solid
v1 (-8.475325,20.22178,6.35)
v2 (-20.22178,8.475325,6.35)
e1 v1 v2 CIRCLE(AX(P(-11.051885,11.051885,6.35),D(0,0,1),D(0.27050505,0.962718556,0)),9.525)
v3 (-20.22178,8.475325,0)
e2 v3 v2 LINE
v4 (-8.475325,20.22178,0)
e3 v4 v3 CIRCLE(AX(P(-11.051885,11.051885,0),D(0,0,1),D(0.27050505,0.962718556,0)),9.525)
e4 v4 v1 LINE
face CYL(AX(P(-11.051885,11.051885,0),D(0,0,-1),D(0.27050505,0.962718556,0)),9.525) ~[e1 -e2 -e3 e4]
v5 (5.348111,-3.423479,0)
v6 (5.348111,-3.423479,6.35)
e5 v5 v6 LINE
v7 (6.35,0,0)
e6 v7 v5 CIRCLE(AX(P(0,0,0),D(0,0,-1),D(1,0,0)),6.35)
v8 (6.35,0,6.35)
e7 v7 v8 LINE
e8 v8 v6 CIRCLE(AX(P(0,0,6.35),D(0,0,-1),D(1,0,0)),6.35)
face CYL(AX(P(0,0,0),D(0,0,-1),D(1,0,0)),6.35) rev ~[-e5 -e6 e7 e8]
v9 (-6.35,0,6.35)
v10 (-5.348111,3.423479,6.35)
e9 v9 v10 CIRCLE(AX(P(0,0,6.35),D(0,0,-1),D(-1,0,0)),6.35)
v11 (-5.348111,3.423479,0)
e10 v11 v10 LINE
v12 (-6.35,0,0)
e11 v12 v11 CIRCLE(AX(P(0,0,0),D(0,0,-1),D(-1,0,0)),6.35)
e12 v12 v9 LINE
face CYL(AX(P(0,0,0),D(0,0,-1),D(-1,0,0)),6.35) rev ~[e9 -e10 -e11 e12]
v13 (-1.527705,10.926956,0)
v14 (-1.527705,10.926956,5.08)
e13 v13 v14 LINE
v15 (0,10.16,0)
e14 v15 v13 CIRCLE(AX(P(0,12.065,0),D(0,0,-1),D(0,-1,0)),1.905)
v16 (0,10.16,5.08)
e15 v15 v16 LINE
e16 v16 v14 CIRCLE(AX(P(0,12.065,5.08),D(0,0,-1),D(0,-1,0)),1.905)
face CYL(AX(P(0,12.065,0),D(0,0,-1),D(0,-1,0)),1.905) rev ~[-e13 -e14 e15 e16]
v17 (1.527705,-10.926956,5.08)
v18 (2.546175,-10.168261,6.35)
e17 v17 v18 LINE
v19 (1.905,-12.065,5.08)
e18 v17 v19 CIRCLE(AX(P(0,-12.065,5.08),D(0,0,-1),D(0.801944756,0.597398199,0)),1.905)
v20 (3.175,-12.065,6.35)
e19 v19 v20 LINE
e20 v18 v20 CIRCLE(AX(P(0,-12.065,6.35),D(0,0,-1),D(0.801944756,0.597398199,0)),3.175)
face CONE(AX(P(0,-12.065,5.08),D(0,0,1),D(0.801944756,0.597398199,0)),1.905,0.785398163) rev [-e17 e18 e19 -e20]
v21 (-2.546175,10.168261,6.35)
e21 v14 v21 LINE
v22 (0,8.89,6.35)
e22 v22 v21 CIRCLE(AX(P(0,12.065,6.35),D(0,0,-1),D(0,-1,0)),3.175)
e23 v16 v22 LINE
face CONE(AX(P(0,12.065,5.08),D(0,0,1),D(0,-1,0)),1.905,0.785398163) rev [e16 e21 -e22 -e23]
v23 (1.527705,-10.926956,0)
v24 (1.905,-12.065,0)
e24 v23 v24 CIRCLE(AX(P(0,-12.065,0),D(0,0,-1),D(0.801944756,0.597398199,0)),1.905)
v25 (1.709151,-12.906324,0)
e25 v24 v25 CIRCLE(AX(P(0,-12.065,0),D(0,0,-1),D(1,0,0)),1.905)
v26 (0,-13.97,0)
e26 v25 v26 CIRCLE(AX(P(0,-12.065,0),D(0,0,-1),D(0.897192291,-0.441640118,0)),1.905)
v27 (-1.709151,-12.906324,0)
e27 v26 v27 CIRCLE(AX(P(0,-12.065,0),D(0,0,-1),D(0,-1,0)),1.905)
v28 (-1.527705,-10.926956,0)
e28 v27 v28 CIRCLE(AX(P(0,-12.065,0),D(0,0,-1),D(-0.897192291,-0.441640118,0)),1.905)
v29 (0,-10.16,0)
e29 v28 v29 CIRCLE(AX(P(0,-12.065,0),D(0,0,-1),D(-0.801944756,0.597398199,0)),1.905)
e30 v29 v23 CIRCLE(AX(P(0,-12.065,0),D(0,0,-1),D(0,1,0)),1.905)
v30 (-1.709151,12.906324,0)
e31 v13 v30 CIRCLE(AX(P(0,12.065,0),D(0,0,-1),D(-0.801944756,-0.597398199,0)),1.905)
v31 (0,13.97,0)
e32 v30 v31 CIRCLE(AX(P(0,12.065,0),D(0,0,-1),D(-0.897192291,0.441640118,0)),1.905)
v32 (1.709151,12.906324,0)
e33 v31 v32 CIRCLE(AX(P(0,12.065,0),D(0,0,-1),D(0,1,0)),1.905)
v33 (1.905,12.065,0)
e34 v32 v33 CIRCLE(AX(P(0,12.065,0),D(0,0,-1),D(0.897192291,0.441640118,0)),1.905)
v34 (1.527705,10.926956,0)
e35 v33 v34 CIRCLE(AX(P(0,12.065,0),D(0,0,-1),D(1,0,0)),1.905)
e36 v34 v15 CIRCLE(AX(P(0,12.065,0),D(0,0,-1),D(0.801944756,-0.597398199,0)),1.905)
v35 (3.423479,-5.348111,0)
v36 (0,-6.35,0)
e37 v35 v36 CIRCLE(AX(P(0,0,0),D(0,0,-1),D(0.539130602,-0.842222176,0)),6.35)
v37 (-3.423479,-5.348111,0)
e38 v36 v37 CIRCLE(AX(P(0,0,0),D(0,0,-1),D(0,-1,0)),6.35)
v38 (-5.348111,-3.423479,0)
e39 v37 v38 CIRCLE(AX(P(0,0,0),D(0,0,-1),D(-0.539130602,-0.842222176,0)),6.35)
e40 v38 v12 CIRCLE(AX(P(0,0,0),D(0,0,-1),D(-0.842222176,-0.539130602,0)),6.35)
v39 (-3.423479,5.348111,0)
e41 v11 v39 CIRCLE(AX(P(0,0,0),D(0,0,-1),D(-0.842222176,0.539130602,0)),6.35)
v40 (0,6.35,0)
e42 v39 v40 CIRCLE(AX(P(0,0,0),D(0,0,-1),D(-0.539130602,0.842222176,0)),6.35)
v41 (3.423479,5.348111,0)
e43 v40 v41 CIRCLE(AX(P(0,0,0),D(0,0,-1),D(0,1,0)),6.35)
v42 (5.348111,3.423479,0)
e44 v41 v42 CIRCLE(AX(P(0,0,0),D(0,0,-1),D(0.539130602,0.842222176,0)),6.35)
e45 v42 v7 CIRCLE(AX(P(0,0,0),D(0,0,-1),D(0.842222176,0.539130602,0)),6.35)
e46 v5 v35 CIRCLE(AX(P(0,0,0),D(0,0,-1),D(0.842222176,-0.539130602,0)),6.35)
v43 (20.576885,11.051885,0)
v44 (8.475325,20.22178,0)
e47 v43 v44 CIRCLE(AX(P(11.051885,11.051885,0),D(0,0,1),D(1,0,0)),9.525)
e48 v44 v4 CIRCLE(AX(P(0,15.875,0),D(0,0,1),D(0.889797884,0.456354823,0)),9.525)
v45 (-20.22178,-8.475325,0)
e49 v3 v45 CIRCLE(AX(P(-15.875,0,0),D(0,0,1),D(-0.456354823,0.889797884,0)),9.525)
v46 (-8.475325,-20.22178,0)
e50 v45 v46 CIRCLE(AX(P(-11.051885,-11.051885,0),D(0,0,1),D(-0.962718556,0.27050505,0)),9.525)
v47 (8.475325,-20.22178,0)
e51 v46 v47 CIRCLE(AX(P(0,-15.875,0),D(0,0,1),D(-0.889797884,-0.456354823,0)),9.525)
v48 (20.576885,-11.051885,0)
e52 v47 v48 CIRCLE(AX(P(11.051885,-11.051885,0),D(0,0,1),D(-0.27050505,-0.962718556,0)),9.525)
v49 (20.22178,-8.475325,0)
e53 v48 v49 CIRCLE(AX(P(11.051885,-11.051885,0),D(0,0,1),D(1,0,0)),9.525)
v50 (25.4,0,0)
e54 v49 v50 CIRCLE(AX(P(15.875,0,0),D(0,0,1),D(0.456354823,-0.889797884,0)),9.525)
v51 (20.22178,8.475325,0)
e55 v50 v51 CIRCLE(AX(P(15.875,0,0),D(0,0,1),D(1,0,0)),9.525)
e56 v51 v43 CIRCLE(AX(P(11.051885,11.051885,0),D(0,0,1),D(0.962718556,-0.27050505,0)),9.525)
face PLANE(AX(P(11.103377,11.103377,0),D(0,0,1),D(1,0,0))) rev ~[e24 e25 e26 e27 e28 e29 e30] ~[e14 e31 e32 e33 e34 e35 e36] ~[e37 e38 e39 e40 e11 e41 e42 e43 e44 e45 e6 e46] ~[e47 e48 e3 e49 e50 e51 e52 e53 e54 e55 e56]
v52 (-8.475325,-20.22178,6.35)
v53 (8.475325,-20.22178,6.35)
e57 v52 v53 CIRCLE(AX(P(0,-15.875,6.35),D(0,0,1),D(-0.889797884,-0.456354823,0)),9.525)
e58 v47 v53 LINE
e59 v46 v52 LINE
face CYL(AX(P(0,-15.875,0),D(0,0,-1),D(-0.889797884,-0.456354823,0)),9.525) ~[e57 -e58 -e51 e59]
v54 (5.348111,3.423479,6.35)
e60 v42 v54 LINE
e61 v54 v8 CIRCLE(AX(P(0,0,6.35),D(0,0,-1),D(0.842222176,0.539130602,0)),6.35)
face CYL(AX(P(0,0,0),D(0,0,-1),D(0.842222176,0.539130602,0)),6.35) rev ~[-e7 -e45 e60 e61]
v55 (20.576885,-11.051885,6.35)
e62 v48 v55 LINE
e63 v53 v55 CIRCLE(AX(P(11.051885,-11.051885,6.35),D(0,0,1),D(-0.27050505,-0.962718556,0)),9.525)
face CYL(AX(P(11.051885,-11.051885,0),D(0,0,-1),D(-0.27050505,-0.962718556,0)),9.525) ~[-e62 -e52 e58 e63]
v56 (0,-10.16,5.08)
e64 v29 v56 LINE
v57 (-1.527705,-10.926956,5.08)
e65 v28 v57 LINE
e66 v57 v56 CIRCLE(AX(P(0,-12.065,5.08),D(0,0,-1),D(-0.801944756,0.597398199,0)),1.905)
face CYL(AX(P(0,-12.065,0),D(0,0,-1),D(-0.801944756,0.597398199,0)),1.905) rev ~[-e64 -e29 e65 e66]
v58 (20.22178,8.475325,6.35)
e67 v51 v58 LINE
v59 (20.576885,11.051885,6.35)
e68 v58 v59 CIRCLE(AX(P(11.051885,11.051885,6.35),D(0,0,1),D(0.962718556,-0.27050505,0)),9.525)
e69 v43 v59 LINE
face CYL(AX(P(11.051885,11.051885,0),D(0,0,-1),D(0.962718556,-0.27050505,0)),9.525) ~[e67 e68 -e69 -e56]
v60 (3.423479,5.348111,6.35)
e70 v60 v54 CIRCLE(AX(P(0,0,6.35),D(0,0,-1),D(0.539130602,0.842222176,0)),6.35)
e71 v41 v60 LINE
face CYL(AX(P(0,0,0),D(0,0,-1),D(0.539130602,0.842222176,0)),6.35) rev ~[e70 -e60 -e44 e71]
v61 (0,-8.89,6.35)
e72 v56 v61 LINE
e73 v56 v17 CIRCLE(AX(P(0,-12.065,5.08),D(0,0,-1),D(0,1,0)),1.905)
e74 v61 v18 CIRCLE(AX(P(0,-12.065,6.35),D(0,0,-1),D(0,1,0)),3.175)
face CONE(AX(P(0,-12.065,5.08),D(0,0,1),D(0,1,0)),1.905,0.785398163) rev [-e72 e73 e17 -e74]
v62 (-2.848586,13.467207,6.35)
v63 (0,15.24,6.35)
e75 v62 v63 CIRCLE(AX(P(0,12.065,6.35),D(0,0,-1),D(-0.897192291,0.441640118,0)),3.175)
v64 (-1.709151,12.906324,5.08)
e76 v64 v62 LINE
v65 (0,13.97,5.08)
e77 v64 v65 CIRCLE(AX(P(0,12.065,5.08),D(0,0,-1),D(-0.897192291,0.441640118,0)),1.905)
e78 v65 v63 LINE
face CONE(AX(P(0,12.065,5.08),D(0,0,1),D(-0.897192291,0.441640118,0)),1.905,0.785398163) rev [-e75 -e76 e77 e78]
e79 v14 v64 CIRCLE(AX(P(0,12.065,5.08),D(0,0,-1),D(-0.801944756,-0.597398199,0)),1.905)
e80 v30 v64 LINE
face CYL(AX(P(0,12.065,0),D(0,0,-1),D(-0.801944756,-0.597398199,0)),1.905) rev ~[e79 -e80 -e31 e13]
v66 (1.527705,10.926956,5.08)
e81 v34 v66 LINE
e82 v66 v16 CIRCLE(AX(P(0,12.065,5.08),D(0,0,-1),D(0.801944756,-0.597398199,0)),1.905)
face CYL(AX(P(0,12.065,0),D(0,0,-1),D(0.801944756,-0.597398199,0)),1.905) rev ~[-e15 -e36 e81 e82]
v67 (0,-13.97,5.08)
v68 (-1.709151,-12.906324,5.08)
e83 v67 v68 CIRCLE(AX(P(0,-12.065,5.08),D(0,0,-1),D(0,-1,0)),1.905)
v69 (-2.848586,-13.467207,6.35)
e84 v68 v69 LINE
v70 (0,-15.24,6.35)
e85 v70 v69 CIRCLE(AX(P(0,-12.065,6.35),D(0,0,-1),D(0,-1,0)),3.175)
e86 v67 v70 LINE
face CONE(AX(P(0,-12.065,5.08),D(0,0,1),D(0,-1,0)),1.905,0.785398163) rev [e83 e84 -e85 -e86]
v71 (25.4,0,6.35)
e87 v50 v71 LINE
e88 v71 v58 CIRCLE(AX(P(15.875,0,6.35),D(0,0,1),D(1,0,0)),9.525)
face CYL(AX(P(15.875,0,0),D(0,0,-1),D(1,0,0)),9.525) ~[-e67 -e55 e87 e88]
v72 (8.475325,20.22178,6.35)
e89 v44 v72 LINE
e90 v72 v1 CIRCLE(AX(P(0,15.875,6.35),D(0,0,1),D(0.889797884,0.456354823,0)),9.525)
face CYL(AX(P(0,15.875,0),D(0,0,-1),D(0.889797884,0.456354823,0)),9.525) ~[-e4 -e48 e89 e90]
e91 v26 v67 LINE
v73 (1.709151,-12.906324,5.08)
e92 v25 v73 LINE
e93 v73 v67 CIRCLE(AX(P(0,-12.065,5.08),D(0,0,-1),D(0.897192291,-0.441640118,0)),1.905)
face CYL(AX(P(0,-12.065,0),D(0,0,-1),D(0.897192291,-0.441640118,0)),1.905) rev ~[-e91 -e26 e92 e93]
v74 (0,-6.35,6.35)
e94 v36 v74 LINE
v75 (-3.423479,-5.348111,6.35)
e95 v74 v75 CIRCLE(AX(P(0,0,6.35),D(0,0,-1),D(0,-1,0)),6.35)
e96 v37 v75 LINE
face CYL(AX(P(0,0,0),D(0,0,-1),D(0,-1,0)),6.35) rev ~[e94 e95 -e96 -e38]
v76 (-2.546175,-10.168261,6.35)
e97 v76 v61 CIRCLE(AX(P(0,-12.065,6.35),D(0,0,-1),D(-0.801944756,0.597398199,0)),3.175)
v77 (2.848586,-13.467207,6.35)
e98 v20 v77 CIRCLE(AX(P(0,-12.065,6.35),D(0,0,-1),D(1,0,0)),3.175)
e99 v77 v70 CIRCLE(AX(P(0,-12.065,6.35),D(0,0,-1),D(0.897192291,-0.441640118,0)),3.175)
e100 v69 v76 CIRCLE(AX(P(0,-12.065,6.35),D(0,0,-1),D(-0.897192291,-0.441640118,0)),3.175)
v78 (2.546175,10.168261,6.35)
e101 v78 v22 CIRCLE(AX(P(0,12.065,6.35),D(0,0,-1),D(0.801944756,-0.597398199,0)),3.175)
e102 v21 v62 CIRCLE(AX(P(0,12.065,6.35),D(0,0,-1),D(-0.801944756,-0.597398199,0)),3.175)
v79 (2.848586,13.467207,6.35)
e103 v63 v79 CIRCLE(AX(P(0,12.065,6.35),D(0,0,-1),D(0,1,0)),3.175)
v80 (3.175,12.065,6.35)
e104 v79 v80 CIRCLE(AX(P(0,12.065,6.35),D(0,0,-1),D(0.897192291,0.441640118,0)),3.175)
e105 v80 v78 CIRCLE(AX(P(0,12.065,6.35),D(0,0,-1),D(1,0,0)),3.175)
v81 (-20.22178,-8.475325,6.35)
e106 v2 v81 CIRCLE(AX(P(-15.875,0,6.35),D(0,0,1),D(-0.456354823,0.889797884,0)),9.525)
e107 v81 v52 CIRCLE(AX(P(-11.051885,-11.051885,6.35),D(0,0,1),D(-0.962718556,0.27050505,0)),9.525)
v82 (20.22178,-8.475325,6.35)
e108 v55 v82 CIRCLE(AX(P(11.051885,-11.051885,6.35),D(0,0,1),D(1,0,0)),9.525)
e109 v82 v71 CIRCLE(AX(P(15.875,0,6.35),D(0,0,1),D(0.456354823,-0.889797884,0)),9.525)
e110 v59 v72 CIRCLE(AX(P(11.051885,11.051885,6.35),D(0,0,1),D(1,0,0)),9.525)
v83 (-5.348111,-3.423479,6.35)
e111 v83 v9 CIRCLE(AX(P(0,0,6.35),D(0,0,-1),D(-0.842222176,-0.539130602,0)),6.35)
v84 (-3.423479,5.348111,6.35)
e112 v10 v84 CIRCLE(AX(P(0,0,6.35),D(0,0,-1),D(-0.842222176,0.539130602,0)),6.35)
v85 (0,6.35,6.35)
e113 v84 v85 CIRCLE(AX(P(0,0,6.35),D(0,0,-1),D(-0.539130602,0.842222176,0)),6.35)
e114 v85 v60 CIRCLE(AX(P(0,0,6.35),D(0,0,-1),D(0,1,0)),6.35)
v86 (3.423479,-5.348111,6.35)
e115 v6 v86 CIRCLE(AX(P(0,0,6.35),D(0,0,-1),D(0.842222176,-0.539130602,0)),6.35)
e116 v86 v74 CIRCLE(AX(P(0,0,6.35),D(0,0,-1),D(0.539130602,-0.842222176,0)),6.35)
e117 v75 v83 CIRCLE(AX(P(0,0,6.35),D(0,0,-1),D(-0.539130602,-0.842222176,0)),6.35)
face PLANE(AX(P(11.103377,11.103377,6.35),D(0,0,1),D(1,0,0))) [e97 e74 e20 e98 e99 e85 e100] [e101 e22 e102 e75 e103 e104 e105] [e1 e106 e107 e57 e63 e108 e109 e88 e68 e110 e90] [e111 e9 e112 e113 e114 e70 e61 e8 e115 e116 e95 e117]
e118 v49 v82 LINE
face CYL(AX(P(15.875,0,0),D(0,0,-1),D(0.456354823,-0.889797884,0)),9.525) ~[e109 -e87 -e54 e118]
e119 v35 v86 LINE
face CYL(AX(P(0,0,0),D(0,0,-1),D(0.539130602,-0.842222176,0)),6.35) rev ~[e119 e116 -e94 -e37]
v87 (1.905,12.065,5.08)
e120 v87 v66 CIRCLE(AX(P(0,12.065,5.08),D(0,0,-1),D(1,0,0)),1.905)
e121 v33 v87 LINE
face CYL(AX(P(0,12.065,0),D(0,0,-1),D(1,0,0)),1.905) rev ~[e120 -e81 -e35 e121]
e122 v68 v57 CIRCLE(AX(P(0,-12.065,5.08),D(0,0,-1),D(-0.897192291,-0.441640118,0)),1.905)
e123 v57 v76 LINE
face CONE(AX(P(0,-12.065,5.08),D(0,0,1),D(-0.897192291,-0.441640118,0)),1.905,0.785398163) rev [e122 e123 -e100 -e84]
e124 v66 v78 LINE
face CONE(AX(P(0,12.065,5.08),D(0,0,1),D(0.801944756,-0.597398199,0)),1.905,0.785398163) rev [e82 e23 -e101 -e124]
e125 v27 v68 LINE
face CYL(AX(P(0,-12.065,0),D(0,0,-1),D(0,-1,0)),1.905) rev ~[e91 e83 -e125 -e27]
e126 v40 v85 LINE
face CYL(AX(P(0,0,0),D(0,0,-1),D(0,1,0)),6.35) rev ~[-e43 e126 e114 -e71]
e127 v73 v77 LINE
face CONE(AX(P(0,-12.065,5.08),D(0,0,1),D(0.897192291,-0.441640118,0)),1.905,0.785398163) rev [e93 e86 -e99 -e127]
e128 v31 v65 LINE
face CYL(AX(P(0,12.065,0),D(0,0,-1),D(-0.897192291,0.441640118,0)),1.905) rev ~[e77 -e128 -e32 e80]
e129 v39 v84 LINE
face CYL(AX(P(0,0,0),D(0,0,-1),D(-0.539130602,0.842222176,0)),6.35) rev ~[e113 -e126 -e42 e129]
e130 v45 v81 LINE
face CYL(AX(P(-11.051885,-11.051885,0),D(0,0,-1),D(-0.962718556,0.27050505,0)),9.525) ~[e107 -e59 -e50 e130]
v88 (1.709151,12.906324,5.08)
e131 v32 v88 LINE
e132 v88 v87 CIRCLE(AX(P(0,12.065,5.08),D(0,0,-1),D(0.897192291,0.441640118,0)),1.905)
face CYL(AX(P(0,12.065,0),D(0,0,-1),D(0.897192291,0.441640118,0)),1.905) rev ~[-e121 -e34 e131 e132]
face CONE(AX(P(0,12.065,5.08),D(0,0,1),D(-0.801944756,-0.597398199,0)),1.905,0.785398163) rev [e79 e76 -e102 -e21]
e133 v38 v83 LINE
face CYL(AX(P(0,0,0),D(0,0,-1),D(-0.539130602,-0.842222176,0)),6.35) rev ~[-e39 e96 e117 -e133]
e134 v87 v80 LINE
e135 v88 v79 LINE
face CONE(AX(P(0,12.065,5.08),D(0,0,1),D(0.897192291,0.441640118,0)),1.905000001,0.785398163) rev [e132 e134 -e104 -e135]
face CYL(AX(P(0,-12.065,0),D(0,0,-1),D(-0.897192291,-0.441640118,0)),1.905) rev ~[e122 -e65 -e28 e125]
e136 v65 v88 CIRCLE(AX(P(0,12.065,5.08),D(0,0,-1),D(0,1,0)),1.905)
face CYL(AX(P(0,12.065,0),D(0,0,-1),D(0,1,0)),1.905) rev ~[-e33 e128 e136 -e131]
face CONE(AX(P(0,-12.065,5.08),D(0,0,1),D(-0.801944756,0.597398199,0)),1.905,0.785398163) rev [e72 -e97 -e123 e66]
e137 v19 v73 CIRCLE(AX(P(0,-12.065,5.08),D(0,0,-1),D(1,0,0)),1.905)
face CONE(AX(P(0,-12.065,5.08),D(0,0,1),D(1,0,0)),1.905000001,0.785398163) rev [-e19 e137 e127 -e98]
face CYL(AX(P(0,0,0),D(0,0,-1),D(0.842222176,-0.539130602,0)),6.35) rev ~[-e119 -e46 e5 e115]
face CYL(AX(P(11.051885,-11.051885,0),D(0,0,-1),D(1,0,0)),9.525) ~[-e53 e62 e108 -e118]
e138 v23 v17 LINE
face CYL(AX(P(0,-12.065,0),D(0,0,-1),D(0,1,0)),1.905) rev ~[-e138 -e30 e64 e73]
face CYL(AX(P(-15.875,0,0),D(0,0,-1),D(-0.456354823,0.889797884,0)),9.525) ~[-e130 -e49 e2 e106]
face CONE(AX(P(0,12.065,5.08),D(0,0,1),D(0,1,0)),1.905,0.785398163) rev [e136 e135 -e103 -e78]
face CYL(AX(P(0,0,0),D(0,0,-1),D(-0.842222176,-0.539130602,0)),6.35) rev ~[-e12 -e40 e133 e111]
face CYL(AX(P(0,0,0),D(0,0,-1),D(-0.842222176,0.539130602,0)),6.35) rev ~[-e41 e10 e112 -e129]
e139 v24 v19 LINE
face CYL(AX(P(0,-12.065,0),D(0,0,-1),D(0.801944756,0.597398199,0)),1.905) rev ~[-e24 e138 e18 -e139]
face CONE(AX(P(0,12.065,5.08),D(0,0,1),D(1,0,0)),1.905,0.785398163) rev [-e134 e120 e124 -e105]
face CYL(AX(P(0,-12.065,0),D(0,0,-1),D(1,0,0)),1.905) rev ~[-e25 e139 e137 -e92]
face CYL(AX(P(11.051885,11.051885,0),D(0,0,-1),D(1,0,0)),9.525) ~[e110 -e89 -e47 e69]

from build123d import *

# Parameters (mm, degrees)
F1_DEPTH = 6.35
F2_SIZE  = 1.27


with BuildPart() as f1:
    # F0 (on Top) → F1 (new body)
    with BuildSketch(Plane.XY):
        with BuildLine():
            Line((9.0862708935, 13.0175), (13.0175, 9.0862708935))
            ThreePointArc((13.0175, 9.0862708935), (11.2253201513, 11.2253201513), (9.0862708935, 13.0175))
        make_face()
        with BuildLine():
            ThreePointArc((20.221779693, 8.4753248493), (16.6798616454, 9.4909337123), (13.0175, 9.0862708935))
            ThreePointArc((13.0175, 9.0862708935), (14.680846164, 6.0405613073), (15.6426389263, 2.7061914978))
            ThreePointArc((15.6426389263, 2.7061914978), (18.5124203716, 5.1302265884), (20.221779693, 8.4753248493))
        make_face()
        with BuildLine():
            ThreePointArc((9.0862708935, 13.0175), (11.2253201513, 11.2253201513), (13.0175, 9.0862708935))
            ThreePointArc((13.0175, 9.0862708935), (16.6798616454, 9.4909337123), (20.221779693, 8.4753248493))
            ThreePointArc((20.221779693, 8.4753248493), (20.4876913926, 9.751427392), (20.5768854467, 11.0518854467))
            ThreePointArc((20.5768854467, 11.0518854467), (16.8044451078, 18.6435705262), (8.4753248493, 20.221779693))
            ThreePointArc((8.4753248493, 20.221779693), (9.2588631643, 18.1108617814), (9.525, 15.875))
            ThreePointArc((9.525, 15.875), (9.4146788384, 14.4295079143), (9.0862708935, 13.0175))
        make_face()
        with BuildLine():
            ThreePointArc((15.6426389263, 2.7061914978), (14.680846164, 6.0405613073), (13.0175, 9.0862708935))
            ThreePointArc((13.0175, 9.0862708935), (9.0369714008, 6.6307608822), (6.7051057537, 2.5765605975))
            ThreePointArc((6.7051057537, 2.5765605975), (11.1900224972, 1.5278871711), (15.6426389263, 2.7061914978))
        make_face()
        with BuildLine():
            ThreePointArc((6.7051057537, 2.5765605975), (9.0369714008, 6.6307608822), (13.0175, 9.0862708935))
            Line((13.0175, 9.0862708935), (9.0862708935, 13.0175))
            ThreePointArc((9.0862708935, 13.0175), (6.6307608822, 9.0369714008), (2.5765605975, 6.7051057537))
            ThreePointArc((2.5765605975, 6.7051057537), (2.9714834378, 6.0087982599), (3.4234793231, 5.3481108183))
            ThreePointArc((3.4234793231, 5.3481108183), (4.4901280605, 4.4901280605), (5.3481108183, 3.4234793231))
            ThreePointArc((5.3481108183, 3.4234793231), (6.0087982599, 2.9714834378), (6.7051057537, 2.5765605975))
        make_face()
        with BuildLine():
            ThreePointArc((2.5765605975, 6.7051057537), (6.6307608822, 9.0369714008), (9.0862708935, 13.0175))
            ThreePointArc((9.0862708935, 13.0175), (6.0405613073, 14.680846164), (2.7061914978, 15.6426389263))
            ThreePointArc((2.7061914978, 15.6426389263), (2.1024733841, 14.3128130347), (1.7091513138, 12.9063244241))
            ThreePointArc((1.7091513138, 12.9063244241), (1.8553919064, 12.4969095665), (1.905, 12.065))
            ThreePointArc((1.905, 12.065), (1.8082177094, 11.465522131), (1.5277047607, 10.9269564313))
            ThreePointArc((1.5277047607, 10.9269564313), (1.8078843831, 8.7553512461), (2.5765605975, 6.7051057537))
        make_face()
        with BuildLine():
            ThreePointArc((2.7061914978, 15.6426389263), (6.0405613073, 14.680846164), (9.0862708935, 13.0175))
            ThreePointArc((9.0862708935, 13.0175), (9.4146788384, 14.4295079143), (9.525, 15.875))
            ThreePointArc((9.525, 15.875), (9.2588631643, 18.1108617814), (8.4753248493, 20.221779693))
            ThreePointArc((8.4753248493, 20.221779693), (5.1302265884, 18.5124203716), (2.7061914978, 15.6426389263))
        make_face()
        with BuildLine():
            ThreePointArc((20.221779693, 8.4753248493), (18.5124203716, 5.1302265884), (15.6426389263, 2.7061914978))
            ThreePointArc((15.6426389263, 2.7061914978), (15.8168030581, 1.3580743804), (15.875, 0))
            ThreePointArc((15.875, 0), (15.8168030581, -1.3580743804), (15.6426389263, -2.7061914978))
            ThreePointArc((15.6426389263, -2.7061914978), (18.5124203716, -5.1302265884), (20.221779693, -8.4753248493))
            ThreePointArc((20.221779693, -8.4753248493), (24.0029979569, -4.9660119021), (25.4, 0))
            ThreePointArc((25.4, 0), (24.0029979569, 4.9660119021), (20.221779693, 8.4753248493))
        make_face()
        with BuildLine():
            ThreePointArc((15.875, 0), (15.8168030581, 1.3580743804), (15.6426389263, 2.7061914978))
            ThreePointArc((15.6426389263, 2.7061914978), (11.1900224972, 1.5278871711), (6.7051057537, 2.5765605975))
            ThreePointArc((6.7051057537, 2.5765605975), (6.4391940541, 1.3004580548), (6.35, 0))
            Line((6.35, 0), (15.875, 0))
        make_face()
        with BuildLine():
            ThreePointArc((6.35, 0), (6.4391940541, 1.3004580548), (6.7051057537, 2.5765605975))
            ThreePointArc((6.7051057537, 2.5765605975), (6.0087982599, 2.9714834378), (5.3481108183, 3.4234793231))
            ThreePointArc((5.3481108183, 3.4234793231), (6.0943828111, 1.783535296), (6.35, 0))
        make_face()
        with BuildLine():
            ThreePointArc((1.7091513138, 12.9063244241), (2.1024733841, 14.3128130347), (2.7061914978, 15.6426389263))
            ThreePointArc((2.7061914978, 15.6426389263), (1.3580743804, 15.8168030581), (0, 15.875))
            Line((0, 15.875), (0, 13.97))
            ThreePointArc((0, 13.97), (1.0065540155, 13.6823663821), (1.7091513138, 12.9063244241))
        make_face()
        with BuildLine():
            ThreePointArc((0, 15.875), (1.3580743804, 15.8168030581), (2.7061914978, 15.6426389263))
            ThreePointArc((2.7061914978, 15.6426389263), (5.1302265884, 18.5124203716), (8.4753248493, 20.221779693))
            ThreePointArc((8.4753248493, 20.221779693), (0, 25.4), (-8.4753248493, 20.221779693))
            ThreePointArc((-8.4753248493, 20.221779693), (-5.1302265884, 18.5124203716), (-2.7061914978, 15.6426389263))
            ThreePointArc((-2.7061914978, 15.6426389263), (-1.3580743804, 15.8168030581), (0, 15.875))
        make_face()
        with BuildLine():
            ThreePointArc((3.4234793231, 5.3481108183), (2.9714834378, 6.0087982599), (2.5765605975, 6.7051057537))
            ThreePointArc((2.5765605975, 6.7051057537), (1.3004580548, 6.4391940541), (0, 6.35))
            ThreePointArc((0, 6.35), (1.783535296, 6.0943828111), (3.4234793231, 5.3481108183))
        make_face()
        with BuildLine():
            ThreePointArc((0, 6.35), (1.3004580548, 6.4391940541), (2.5765605975, 6.7051057537))
            ThreePointArc((2.5765605975, 6.7051057537), (1.8078843831, 8.7553512461), (1.5277047607, 10.9269564313))
            ThreePointArc((1.5277047607, 10.9269564313), (0.8547081378, 10.3625021295), (0, 10.16))
            Line((0, 10.16), (0, 6.35))
        make_face()
        with BuildLine():
            ThreePointArc((15.6426389263, -2.7061914978), (15.8168030581, -1.3580743804), (15.875, 0))
            Line((15.875, 0), (6.35, 0))
            ThreePointArc((6.35, 0), (6.4391940541, -1.3004580548), (6.7051057537, -2.5765605975))
            ThreePointArc((6.7051057537, -2.5765605975), (11.1900224972, -1.5278871711), (15.6426389263, -2.7061914978))
        make_face()
        with BuildLine():
            ThreePointArc((6.7051057537, -2.5765605975), (6.4391940541, -1.3004580548), (6.35, 0))
            ThreePointArc((6.35, 0), (6.0943828111, -1.783535296), (5.3481108183, -3.4234793231))
            ThreePointArc((5.3481108183, -3.4234793231), (6.0087982599, -2.9714834378), (6.7051057537, -2.5765605975))
        make_face()
        with BuildLine():
            Line((0, 13.97), (0, 15.875))
            ThreePointArc((0, 15.875), (-1.3580743804, 15.8168030581), (-2.7061914978, 15.6426389263))
            ThreePointArc((-2.7061914978, 15.6426389263), (-2.1024733841, 14.3128130347), (-1.7091513138, 12.9063244241))
            ThreePointArc((-1.7091513138, 12.9063244241), (-1.0065540155, 13.6823663821), (0, 13.97))
        make_face()
        with BuildLine():
            ThreePointArc((-2.5765605975, 6.7051057537), (-1.3004580548, 6.4391940541), (0, 6.35))
            Line((0, 6.35), (0, 10.16))
            ThreePointArc((0, 10.16), (-0.8547081378, 10.3625021295), (-1.5277047607, 10.9269564313))
            ThreePointArc((-1.5277047607, 10.9269564313), (-1.8078843831, 8.7553512461), (-2.5765605975, 6.7051057537))
        make_face()
        with BuildLine():
            ThreePointArc((-3.4234793231, 5.3481108183), (-1.783535296, 6.0943828111), (0, 6.35))
            ThreePointArc((0, 6.35), (-1.3004580548, 6.4391940541), (-2.5765605975, 6.7051057537))
            ThreePointArc((-2.5765605975, 6.7051057537), (-2.9714834378, 6.0087982599), (-3.4234793231, 5.3481108183))
        make_face()
        with BuildLine():
            ThreePointArc((20.221779693, -8.4753248493), (18.5124203716, -5.1302265884), (15.6426389263, -2.7061914978))
            ThreePointArc((15.6426389263, -2.7061914978), (14.680846164, -6.0405613073), (13.0175, -9.0862708935))
            ThreePointArc((13.0175, -9.0862708935), (16.6798616454, -9.4909337123), (20.221779693, -8.4753248493))
        make_face()
        with BuildLine():
            ThreePointArc((13.0175, -9.0862708935), (14.680846164, -6.0405613073), (15.6426389263, -2.7061914978))
            ThreePointArc((15.6426389263, -2.7061914978), (11.1900224972, -1.5278871711), (6.7051057537, -2.5765605975))
            ThreePointArc((6.7051057537, -2.5765605975), (9.0369714008, -6.6307608822), (13.0175, -9.0862708935))
        make_face()
        with BuildLine():
            ThreePointArc((20.5768854467, -11.0518854467), (20.4876913926, -9.751427392), (20.221779693, -8.4753248493))
            ThreePointArc((20.221779693, -8.4753248493), (16.6798616454, -9.4909337123), (13.0175, -9.0862708935))
            ThreePointArc((13.0175, -9.0862708935), (11.2253201513, -11.2253201513), (9.0862708935, -13.0175))
            ThreePointArc((9.0862708935, -13.0175), (9.4146788384, -14.4295079143), (9.525, -15.875))
            ThreePointArc((9.525, -15.875), (9.2588631643, -18.1108617814), (8.4753248493, -20.221779693))
            ThreePointArc((8.4753248493, -20.221779693), (16.8044451078, -18.6435705262), (20.5768854467, -11.0518854467))
        make_face()
        with BuildLine():
            ThreePointArc((13.0175, -9.0862708935), (9.0369714008, -6.6307608822), (6.7051057537, -2.5765605975))
            ThreePointArc((6.7051057537, -2.5765605975), (6.0087982599, -2.9714834378), (5.3481108183, -3.4234793231))
            ThreePointArc((5.3481108183, -3.4234793231), (4.4901280605, -4.4901280605), (3.4234793231, -5.3481108183))
            ThreePointArc((3.4234793231, -5.3481108183), (2.9714834378, -6.0087982599), (2.5765605975, -6.7051057537))
            ThreePointArc((2.5765605975, -6.7051057537), (6.6307608822, -9.0369714008), (9.0862708935, -13.0175))
            Line((9.0862708935, -13.0175), (13.0175, -9.0862708935))
        make_face()
        with BuildLine():
            ThreePointArc((-1.7091513138, 12.9063244241), (-2.1024733841, 14.3128130347), (-2.7061914978, 15.6426389263))
            ThreePointArc((-2.7061914978, 15.6426389263), (-6.0405613073, 14.680846164), (-9.0862708935, 13.0175))
            ThreePointArc((-9.0862708935, 13.0175), (-6.6307608822, 9.0369714008), (-2.5765605975, 6.7051057537))
            ThreePointArc((-2.5765605975, 6.7051057537), (-1.8078843831, 8.7553512461), (-1.5277047607, 10.9269564313))
            ThreePointArc((-1.5277047607, 10.9269564313), (-1.8970460523, 11.8910998114), (-1.7091513138, 12.9063244241))
        make_face()
        with BuildLine():
            ThreePointArc((-9.0862708935, 13.0175), (-6.0405613073, 14.680846164), (-2.7061914978, 15.6426389263))
            ThreePointArc((-2.7061914978, 15.6426389263), (-5.1302265884, 18.5124203716), (-8.4753248493, 20.221779693))
            ThreePointArc((-8.4753248493, 20.221779693), (-9.4909337123, 16.6798616454), (-9.0862708935, 13.0175))
        make_face()
        with BuildLine():
            ThreePointArc((-9.0862708935, 13.0175), (-9.4909337123, 16.6798616454), (-8.4753248493, 20.221779693))
            ThreePointArc((-8.4753248493, 20.221779693), (-17.7870775376, 17.7870775376), (-20.221779693, 8.4753248493))
            ThreePointArc((-20.221779693, 8.4753248493), (-16.6798616454, 9.4909337123), (-13.0175, 9.0862708935))
            ThreePointArc((-13.0175, 9.0862708935), (-11.2253201513, 11.2253201513), (-9.0862708935, 13.0175))
        make_face()
        with BuildLine():
            ThreePointArc((-3.4234793231, 5.3481108183), (-2.9714834378, 6.0087982599), (-2.5765605975, 6.7051057537))
            ThreePointArc((-2.5765605975, 6.7051057537), (-6.6307608822, 9.0369714008), (-9.0862708935, 13.0175))
            Line((-9.0862708935, 13.0175), (-13.0175, 9.0862708935))
            ThreePointArc((-13.0175, 9.0862708935), (-9.0369714008, 6.6307608822), (-6.7051057537, 2.5765605975))
            ThreePointArc((-6.7051057537, 2.5765605975), (-6.0087982599, 2.9714834378), (-5.3481108183, 3.4234793231))
            ThreePointArc((-5.3481108183, 3.4234793231), (-4.4901280605, 4.4901280605), (-3.4234793231, 5.3481108183))
        make_face()
        with BuildLine():
            ThreePointArc((9.0862708935, -13.0175), (11.2253201513, -11.2253201513), (13.0175, -9.0862708935))
            Line((13.0175, -9.0862708935), (9.0862708935, -13.0175))
        make_face()
        with BuildLine():
            ThreePointArc((2.5765605975, -6.7051057537), (1.3004580548, -6.4391940541), (0, -6.35))
            Line((0, -6.35), (0, -10.16))
            ThreePointArc((0, -10.16), (0.8547081378, -10.3625021295), (1.5277047607, -10.9269564313))
            ThreePointArc((1.5277047607, -10.9269564313), (1.8078843831, -8.7553512461), (2.5765605975, -6.7051057537))
        make_face()
        with BuildLine():
            ThreePointArc((3.4234793231, -5.3481108183), (1.783535296, -6.0943828111), (0, -6.35))
            ThreePointArc((0, -6.35), (1.3004580548, -6.4391940541), (2.5765605975, -6.7051057537))
            ThreePointArc((2.5765605975, -6.7051057537), (2.9714834378, -6.0087982599), (3.4234793231, -5.3481108183))
        make_face()
        with BuildLine():
            Line((0, -10.16), (0, -6.35))
            ThreePointArc((0, -6.35), (-1.3004580548, -6.4391940541), (-2.5765605975, -6.7051057537))
            ThreePointArc((-2.5765605975, -6.7051057537), (-1.8078843831, -8.7553512461), (-1.5277047607, -10.9269564313))
            ThreePointArc((-1.5277047607, -10.9269564313), (-0.8547081378, -10.3625021295), (0, -10.16))
        make_face()
        with BuildLine():
            ThreePointArc((-2.5765605975, -6.7051057537), (-1.3004580548, -6.4391940541), (0, -6.35))
            ThreePointArc((0, -6.35), (-1.783535296, -6.0943828111), (-3.4234793231, -5.3481108183))
            ThreePointArc((-3.4234793231, -5.3481108183), (-2.9714834378, -6.0087982599), (-2.5765605975, -6.7051057537))
        make_face()
        with BuildLine():
            ThreePointArc((-6.7051057537, -2.5765605975), (-6.4391940541, -1.3004580548), (-6.35, 0))
            Line((-6.35, 0), (-15.875, 0))
            ThreePointArc((-15.875, 0), (-15.8168030581, -1.3580743804), (-15.6426389263, -2.7061914978))
            ThreePointArc((-15.6426389263, -2.7061914978), (-11.1900224972, -1.5278871711), (-6.7051057537, -2.5765605975))
        make_face()
        with BuildLine():
            Line((-15.875, 0), (-6.35, 0))
            ThreePointArc((-6.35, 0), (-6.4391940541, 1.3004580548), (-6.7051057537, 2.5765605975))
            ThreePointArc((-6.7051057537, 2.5765605975), (-11.1900224972, 1.5278871711), (-15.6426389263, 2.7061914978))
            ThreePointArc((-15.6426389263, 2.7061914978), (-15.8168030581, 1.3580743804), (-15.875, 0))
        make_face()
        with BuildLine():
            ThreePointArc((-5.3481108183, -3.4234793231), (-6.0943828111, -1.783535296), (-6.35, 0))
            ThreePointArc((-6.35, 0), (-6.4391940541, -1.3004580548), (-6.7051057537, -2.5765605975))
            ThreePointArc((-6.7051057537, -2.5765605975), (-6.0087982599, -2.9714834378), (-5.3481108183, -3.4234793231))
        make_face()
        with BuildLine():
            ThreePointArc((-6.7051057537, 2.5765605975), (-6.4391940541, 1.3004580548), (-6.35, 0))
            ThreePointArc((-6.35, 0), (-6.0943828111, 1.783535296), (-5.3481108183, 3.4234793231))
            ThreePointArc((-5.3481108183, 3.4234793231), (-6.0087982599, 2.9714834378), (-6.7051057537, 2.5765605975))
        make_face()
        with BuildLine():
            Line((-13.0175, 9.0862708935), (-9.0862708935, 13.0175))
            ThreePointArc((-9.0862708935, 13.0175), (-11.2253201513, 11.2253201513), (-13.0175, 9.0862708935))
        make_face()
        with BuildLine():
            ThreePointArc((-15.6426389263, 2.7061914978), (-18.5124203716, 5.1302265884), (-20.221779693, 8.4753248493))
            ThreePointArc((-20.221779693, 8.4753248493), (-25.4, 0), (-20.221779693, -8.4753248493))
            ThreePointArc((-20.221779693, -8.4753248493), (-18.5124203716, -5.1302265884), (-15.6426389263, -2.7061914978))
            ThreePointArc((-15.6426389263, -2.7061914978), (-15.8168030581, -1.3580743804), (-15.875, 0))
            ThreePointArc((-15.875, 0), (-15.8168030581, 1.3580743804), (-15.6426389263, 2.7061914978))
        make_face()
        with BuildLine():
            ThreePointArc((-13.0175, 9.0862708935), (-16.6798616454, 9.4909337123), (-20.221779693, 8.4753248493))
            ThreePointArc((-20.221779693, 8.4753248493), (-18.5124203716, 5.1302265884), (-15.6426389263, 2.7061914978))
            ThreePointArc((-15.6426389263, 2.7061914978), (-14.680846164, 6.0405613073), (-13.0175, 9.0862708935))
        make_face()
        with BuildLine():
            ThreePointArc((9.525, -15.875), (9.4146788384, -14.4295079143), (9.0862708935, -13.0175))
            ThreePointArc((9.0862708935, -13.0175), (6.0405613073, -14.680846164), (2.7061914978, -15.6426389263))
            ThreePointArc((2.7061914978, -15.6426389263), (5.1302265884, -18.5124203716), (8.4753248493, -20.221779693))
            ThreePointArc((8.4753248493, -20.221779693), (9.2588631643, -18.1108617814), (9.525, -15.875))
        make_face()
        with BuildLine():
            ThreePointArc((2.7061914978, -15.6426389263), (6.0405613073, -14.680846164), (9.0862708935, -13.0175))
            ThreePointArc((9.0862708935, -13.0175), (6.6307608822, -9.0369714008), (2.5765605975, -6.7051057537))
            ThreePointArc((2.5765605975, -6.7051057537), (1.8078843831, -8.7553512461), (1.5277047607, -10.9269564313))
            ThreePointArc((1.5277047607, -10.9269564313), (1.8082177094, -11.465522131), (1.905, -12.065))
            ThreePointArc((1.905, -12.065), (1.8553919064, -12.4969095665), (1.7091513138, -12.9063244241))
            ThreePointArc((1.7091513138, -12.9063244241), (2.1024733841, -14.3128130347), (2.7061914978, -15.6426389263))
        make_face()
        with BuildLine():
            ThreePointArc((-8.4753248493, -20.221779693), (0, -25.4), (8.4753248493, -20.221779693))
            ThreePointArc((8.4753248493, -20.221779693), (5.1302265884, -18.5124203716), (2.7061914978, -15.6426389263))
            ThreePointArc((2.7061914978, -15.6426389263), (1.3580743804, -15.8168030581), (0, -15.875))
            ThreePointArc((0, -15.875), (-1.3580743804, -15.8168030581), (-2.7061914978, -15.6426389263))
            ThreePointArc((-2.7061914978, -15.6426389263), (-5.1302265884, -18.5124203716), (-8.4753248493, -20.221779693))
        make_face()
        with BuildLine():
            ThreePointArc((-1.5277047607, -10.9269564313), (-1.8078843831, -8.7553512461), (-2.5765605975, -6.7051057537))
            ThreePointArc((-2.5765605975, -6.7051057537), (-6.6307608822, -9.0369714008), (-9.0862708935, -13.0175))
            ThreePointArc((-9.0862708935, -13.0175), (-6.0405613073, -14.680846164), (-2.7061914978, -15.6426389263))
            ThreePointArc((-2.7061914978, -15.6426389263), (-2.1024733841, -14.3128130347), (-1.7091513138, -12.9063244241))
            ThreePointArc((-1.7091513138, -12.9063244241), (-1.8970460523, -11.8910998114), (-1.5277047607, -10.9269564313))
        make_face()
        with BuildLine():
            ThreePointArc((-9.0862708935, -13.0175), (-6.6307608822, -9.0369714008), (-2.5765605975, -6.7051057537))
            ThreePointArc((-2.5765605975, -6.7051057537), (-2.9714834378, -6.0087982599), (-3.4234793231, -5.3481108183))
            ThreePointArc((-3.4234793231, -5.3481108183), (-4.4901280605, -4.4901280605), (-5.3481108183, -3.4234793231))
            ThreePointArc((-5.3481108183, -3.4234793231), (-6.0087982599, -2.9714834378), (-6.7051057537, -2.5765605975))
            ThreePointArc((-6.7051057537, -2.5765605975), (-9.0369714008, -6.6307608822), (-13.0175, -9.0862708935))
            Line((-13.0175, -9.0862708935), (-9.0862708935, -13.0175))
        make_face()
        with BuildLine():
            ThreePointArc((-15.6426389263, 2.7061914978), (-11.1900224972, 1.5278871711), (-6.7051057537, 2.5765605975))
            ThreePointArc((-6.7051057537, 2.5765605975), (-9.0369714008, 6.6307608822), (-13.0175, 9.0862708935))
            ThreePointArc((-13.0175, 9.0862708935), (-14.680846164, 6.0405613073), (-15.6426389263, 2.7061914978))
        make_face()
        with BuildLine():
            ThreePointArc((-13.0175, -9.0862708935), (-9.0369714008, -6.6307608822), (-6.7051057537, -2.5765605975))
            ThreePointArc((-6.7051057537, -2.5765605975), (-11.1900224972, -1.5278871711), (-15.6426389263, -2.7061914978))
            ThreePointArc((-15.6426389263, -2.7061914978), (-14.680846164, -6.0405613073), (-13.0175, -9.0862708935))
        make_face()
        with BuildLine():
            ThreePointArc((-15.6426389263, -2.7061914978), (-18.5124203716, -5.1302265884), (-20.221779693, -8.4753248493))
            ThreePointArc((-20.221779693, -8.4753248493), (-16.6798616454, -9.4909337123), (-13.0175, -9.0862708935))
            ThreePointArc((-13.0175, -9.0862708935), (-14.680846164, -6.0405613073), (-15.6426389263, -2.7061914978))
        make_face()
        with BuildLine():
            ThreePointArc((-13.0175, -9.0862708935), (-16.6798616454, -9.4909337123), (-20.221779693, -8.4753248493))
            ThreePointArc((-20.221779693, -8.4753248493), (-17.7870775376, -17.7870775376), (-8.4753248493, -20.221779693))
            ThreePointArc((-8.4753248493, -20.221779693), (-9.4909337123, -16.6798616454), (-9.0862708935, -13.0175))
            ThreePointArc((-9.0862708935, -13.0175), (-11.2253201513, -11.2253201513), (-13.0175, -9.0862708935))
        make_face()
        with BuildLine():
            ThreePointArc((0, -15.875), (1.3580743804, -15.8168030581), (2.7061914978, -15.6426389263))
            ThreePointArc((2.7061914978, -15.6426389263), (2.1024733841, -14.3128130347), (1.7091513138, -12.9063244241))
            ThreePointArc((1.7091513138, -12.9063244241), (1.0065540155, -13.6823663821), (0, -13.97))
            Line((0, -13.97), (0, -15.875))
        make_face()
        with BuildLine():
            ThreePointArc((-9.0862708935, -13.0175), (-9.4909337123, -16.6798616454), (-8.4753248493, -20.221779693))
            ThreePointArc((-8.4753248493, -20.221779693), (-5.1302265884, -18.5124203716), (-2.7061914978, -15.6426389263))
            ThreePointArc((-2.7061914978, -15.6426389263), (-6.0405613073, -14.680846164), (-9.0862708935, -13.0175))
        make_face()
        with BuildLine():
            Line((0, -15.875), (0, -13.97))
            ThreePointArc((0, -13.97), (-1.0065540155, -13.6823663821), (-1.7091513138, -12.9063244241))
            ThreePointArc((-1.7091513138, -12.9063244241), (-2.1024733841, -14.3128130347), (-2.7061914978, -15.6426389263))
            ThreePointArc((-2.7061914978, -15.6426389263), (-1.3580743804, -15.8168030581), (0, -15.875))
        make_face()
        with BuildLine():
            ThreePointArc((-13.0175, -9.0862708935), (-11.2253201513, -11.2253201513), (-9.0862708935, -13.0175))
            Line((-9.0862708935, -13.0175), (-13.0175, -9.0862708935))
        make_face()
    extrude(amount=F1_DEPTH)

    # F2
    f2_edges = [f1.edges().sort_by_distance(p)[0] for p in [
        (-1.709151, -11.223676, 6.35),
        (-1.527705, 13.203044, 6.35),
    ]]
    chamfer(f2_edges, length=F2_SIZE)


solid = f1.part
